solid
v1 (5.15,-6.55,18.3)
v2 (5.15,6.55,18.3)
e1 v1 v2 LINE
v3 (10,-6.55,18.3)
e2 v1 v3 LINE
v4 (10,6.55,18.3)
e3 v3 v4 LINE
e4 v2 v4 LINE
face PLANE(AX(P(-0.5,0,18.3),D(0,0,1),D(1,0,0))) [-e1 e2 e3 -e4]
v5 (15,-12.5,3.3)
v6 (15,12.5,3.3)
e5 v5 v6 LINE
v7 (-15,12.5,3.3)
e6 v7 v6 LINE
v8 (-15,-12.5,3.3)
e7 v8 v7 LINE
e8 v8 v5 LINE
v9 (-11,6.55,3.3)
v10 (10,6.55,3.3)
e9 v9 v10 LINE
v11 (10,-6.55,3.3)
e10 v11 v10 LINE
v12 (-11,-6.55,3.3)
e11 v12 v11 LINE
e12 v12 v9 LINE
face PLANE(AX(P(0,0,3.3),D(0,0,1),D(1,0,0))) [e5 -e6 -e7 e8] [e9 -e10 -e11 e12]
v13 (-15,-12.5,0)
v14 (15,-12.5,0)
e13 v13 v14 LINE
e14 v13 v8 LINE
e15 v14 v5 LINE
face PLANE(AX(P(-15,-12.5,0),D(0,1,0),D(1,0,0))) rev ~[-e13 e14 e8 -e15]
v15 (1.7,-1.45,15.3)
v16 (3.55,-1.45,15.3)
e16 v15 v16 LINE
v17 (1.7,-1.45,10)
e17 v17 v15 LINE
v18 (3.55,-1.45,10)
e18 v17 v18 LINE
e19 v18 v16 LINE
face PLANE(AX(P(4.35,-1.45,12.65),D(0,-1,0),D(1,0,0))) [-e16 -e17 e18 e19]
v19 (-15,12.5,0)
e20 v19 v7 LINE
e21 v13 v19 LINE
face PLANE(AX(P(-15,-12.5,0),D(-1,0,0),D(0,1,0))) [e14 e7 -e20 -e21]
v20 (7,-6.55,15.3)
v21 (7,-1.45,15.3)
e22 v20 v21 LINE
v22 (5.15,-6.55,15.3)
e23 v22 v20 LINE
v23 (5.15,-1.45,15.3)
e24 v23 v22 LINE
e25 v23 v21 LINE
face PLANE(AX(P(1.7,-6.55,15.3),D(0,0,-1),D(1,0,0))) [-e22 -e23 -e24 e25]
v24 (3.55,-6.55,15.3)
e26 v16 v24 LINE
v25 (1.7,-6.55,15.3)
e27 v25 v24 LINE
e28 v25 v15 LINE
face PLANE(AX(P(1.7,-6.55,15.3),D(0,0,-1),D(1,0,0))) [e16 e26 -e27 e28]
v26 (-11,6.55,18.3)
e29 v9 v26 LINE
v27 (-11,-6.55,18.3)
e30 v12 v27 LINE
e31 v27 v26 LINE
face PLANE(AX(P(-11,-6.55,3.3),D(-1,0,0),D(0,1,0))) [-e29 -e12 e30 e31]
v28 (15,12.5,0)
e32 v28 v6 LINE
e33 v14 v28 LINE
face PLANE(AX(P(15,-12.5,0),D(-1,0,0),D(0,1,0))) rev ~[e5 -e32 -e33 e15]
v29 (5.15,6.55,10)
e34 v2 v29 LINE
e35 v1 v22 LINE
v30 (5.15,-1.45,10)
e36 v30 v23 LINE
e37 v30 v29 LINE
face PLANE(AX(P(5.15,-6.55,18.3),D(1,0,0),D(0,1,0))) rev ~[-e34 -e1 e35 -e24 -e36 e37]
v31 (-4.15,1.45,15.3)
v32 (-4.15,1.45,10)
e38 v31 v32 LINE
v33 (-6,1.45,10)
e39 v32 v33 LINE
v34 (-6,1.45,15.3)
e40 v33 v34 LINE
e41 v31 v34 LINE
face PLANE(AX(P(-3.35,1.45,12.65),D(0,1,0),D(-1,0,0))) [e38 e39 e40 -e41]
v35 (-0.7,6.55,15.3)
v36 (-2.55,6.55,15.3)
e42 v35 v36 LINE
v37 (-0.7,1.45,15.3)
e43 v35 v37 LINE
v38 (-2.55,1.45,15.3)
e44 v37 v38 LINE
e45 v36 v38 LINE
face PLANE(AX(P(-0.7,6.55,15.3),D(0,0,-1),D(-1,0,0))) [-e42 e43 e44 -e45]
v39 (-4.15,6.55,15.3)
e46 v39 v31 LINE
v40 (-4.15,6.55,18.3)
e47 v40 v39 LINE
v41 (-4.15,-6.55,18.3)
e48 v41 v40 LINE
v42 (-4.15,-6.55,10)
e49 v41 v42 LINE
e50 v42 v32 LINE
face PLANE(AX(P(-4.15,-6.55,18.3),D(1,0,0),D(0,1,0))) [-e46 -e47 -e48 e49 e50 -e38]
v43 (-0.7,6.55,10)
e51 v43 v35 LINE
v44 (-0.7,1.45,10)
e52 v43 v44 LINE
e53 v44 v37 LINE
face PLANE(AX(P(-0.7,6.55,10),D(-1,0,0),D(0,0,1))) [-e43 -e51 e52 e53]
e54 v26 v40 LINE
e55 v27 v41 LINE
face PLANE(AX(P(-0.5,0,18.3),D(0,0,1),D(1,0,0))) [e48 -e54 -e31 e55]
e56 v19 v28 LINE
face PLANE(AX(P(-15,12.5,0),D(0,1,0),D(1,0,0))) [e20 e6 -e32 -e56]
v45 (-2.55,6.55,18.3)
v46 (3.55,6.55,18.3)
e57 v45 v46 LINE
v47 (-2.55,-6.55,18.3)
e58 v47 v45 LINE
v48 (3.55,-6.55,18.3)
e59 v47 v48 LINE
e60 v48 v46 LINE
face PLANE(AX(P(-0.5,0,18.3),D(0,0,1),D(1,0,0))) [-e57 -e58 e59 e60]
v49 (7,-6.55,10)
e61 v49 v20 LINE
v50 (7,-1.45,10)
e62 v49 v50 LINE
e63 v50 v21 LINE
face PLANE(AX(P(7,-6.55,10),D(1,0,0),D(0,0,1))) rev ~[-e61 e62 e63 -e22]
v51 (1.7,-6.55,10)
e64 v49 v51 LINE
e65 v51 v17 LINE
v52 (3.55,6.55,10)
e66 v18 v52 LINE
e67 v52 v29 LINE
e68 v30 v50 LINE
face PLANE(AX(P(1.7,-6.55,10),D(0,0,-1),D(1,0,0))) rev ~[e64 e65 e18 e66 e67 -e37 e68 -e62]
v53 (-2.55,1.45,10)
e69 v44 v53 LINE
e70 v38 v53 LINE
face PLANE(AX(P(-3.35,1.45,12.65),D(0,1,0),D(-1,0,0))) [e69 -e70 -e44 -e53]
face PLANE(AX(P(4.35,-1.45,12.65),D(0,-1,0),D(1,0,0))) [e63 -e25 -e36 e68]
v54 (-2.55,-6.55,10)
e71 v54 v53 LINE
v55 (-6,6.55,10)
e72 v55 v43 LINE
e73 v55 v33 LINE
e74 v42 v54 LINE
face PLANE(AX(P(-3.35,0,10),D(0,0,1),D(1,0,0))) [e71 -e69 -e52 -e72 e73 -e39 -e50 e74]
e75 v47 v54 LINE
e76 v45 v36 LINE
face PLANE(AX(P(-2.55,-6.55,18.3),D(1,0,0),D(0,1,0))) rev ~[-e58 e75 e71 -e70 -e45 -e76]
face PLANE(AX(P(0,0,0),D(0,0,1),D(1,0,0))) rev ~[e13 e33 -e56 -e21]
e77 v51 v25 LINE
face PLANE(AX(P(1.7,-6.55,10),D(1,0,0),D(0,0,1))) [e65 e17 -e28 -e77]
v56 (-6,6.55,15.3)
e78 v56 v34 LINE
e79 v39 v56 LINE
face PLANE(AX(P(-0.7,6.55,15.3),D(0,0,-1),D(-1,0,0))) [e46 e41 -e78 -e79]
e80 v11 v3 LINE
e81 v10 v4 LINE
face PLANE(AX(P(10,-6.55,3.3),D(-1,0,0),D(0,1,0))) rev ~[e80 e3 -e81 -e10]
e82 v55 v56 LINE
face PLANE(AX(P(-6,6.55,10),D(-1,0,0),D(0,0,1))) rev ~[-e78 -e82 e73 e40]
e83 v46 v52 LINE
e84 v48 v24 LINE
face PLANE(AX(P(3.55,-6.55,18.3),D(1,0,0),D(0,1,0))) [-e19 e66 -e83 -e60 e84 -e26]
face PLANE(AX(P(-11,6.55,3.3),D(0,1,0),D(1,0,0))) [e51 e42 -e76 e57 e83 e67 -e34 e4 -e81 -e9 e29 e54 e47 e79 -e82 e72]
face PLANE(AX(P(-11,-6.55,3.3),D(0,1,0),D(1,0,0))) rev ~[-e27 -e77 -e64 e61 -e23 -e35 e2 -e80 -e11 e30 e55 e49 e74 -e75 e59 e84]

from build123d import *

# Parameters (mm, degrees)
F0_W      = 30
F0_H      = 25
F1_DEPTH  = 3.3
F2_W      = 21
F2_H      = 13.1
F3_DEPTH  = 15
F4_W      = 5.3
F4_H      = 5.3
F5_DEPTH  = 5.1
F6_W      = 1.6
F6_H      = 13.1
F7_DEPTH  = 8.3
F8_W      = 5.3
F8_H      = 5.3
F9_DEPTH  = 5.1
F10_W     = 1.6
F10_H     = 13.1
F11_DEPTH = 8.3


# Not quite as in the source:
# - a feature names something its author has since deleted; it is built from what else it names


with BuildPart() as f1:
    # F0 (on Top) → F1 (new body)
    with BuildSketch(Plane.XY):
        Rectangle(F0_W, F0_H)
    extrude(amount=F1_DEPTH)

    # F2 (on face) → F3 (join)
    with BuildSketch(Plane.XY.offset(3.3)):
        with Locations((-0.5, 0)):
            Rectangle(F2_W, F2_H)
    extrude(amount=F3_DEPTH)

    # F4 (on face) → F5 (cut)
    with BuildSketch(Plane.XZ.offset(6.55)):
        with Locations((4.35, 12.65)):
            Rectangle(F4_W, F4_H)
    extrude(amount=-F5_DEPTH, mode=Mode.SUBTRACT)

    # F6 (on face) → F7 (cut)
    with BuildSketch(Plane.XY.offset(18.3)):
        with Locations((4.35, 0)):
            Rectangle(F6_W, F6_H)
    extrude(amount=-F7_DEPTH, mode=Mode.SUBTRACT)

    # F8 (on face) → F9 (cut)
    with BuildSketch(Plane(origin=(0, 6.55, 0), x_dir=(-1, 0, 0), z_dir=(0, 1, 0))):
        with Locations((3.35, 12.65)):
            Rectangle(F8_W, F8_H)
    extrude(amount=-F9_DEPTH, mode=Mode.SUBTRACT)

    # F10 (on face) → F11 (cut)
    with BuildSketch(Plane.XY.offset(18.3)):
        with Locations((-3.35, 0)):
            Rectangle(F10_W, F10_H)
    extrude(amount=-F11_DEPTH, mode=Mode.SUBTRACT)


solid = f1.part
